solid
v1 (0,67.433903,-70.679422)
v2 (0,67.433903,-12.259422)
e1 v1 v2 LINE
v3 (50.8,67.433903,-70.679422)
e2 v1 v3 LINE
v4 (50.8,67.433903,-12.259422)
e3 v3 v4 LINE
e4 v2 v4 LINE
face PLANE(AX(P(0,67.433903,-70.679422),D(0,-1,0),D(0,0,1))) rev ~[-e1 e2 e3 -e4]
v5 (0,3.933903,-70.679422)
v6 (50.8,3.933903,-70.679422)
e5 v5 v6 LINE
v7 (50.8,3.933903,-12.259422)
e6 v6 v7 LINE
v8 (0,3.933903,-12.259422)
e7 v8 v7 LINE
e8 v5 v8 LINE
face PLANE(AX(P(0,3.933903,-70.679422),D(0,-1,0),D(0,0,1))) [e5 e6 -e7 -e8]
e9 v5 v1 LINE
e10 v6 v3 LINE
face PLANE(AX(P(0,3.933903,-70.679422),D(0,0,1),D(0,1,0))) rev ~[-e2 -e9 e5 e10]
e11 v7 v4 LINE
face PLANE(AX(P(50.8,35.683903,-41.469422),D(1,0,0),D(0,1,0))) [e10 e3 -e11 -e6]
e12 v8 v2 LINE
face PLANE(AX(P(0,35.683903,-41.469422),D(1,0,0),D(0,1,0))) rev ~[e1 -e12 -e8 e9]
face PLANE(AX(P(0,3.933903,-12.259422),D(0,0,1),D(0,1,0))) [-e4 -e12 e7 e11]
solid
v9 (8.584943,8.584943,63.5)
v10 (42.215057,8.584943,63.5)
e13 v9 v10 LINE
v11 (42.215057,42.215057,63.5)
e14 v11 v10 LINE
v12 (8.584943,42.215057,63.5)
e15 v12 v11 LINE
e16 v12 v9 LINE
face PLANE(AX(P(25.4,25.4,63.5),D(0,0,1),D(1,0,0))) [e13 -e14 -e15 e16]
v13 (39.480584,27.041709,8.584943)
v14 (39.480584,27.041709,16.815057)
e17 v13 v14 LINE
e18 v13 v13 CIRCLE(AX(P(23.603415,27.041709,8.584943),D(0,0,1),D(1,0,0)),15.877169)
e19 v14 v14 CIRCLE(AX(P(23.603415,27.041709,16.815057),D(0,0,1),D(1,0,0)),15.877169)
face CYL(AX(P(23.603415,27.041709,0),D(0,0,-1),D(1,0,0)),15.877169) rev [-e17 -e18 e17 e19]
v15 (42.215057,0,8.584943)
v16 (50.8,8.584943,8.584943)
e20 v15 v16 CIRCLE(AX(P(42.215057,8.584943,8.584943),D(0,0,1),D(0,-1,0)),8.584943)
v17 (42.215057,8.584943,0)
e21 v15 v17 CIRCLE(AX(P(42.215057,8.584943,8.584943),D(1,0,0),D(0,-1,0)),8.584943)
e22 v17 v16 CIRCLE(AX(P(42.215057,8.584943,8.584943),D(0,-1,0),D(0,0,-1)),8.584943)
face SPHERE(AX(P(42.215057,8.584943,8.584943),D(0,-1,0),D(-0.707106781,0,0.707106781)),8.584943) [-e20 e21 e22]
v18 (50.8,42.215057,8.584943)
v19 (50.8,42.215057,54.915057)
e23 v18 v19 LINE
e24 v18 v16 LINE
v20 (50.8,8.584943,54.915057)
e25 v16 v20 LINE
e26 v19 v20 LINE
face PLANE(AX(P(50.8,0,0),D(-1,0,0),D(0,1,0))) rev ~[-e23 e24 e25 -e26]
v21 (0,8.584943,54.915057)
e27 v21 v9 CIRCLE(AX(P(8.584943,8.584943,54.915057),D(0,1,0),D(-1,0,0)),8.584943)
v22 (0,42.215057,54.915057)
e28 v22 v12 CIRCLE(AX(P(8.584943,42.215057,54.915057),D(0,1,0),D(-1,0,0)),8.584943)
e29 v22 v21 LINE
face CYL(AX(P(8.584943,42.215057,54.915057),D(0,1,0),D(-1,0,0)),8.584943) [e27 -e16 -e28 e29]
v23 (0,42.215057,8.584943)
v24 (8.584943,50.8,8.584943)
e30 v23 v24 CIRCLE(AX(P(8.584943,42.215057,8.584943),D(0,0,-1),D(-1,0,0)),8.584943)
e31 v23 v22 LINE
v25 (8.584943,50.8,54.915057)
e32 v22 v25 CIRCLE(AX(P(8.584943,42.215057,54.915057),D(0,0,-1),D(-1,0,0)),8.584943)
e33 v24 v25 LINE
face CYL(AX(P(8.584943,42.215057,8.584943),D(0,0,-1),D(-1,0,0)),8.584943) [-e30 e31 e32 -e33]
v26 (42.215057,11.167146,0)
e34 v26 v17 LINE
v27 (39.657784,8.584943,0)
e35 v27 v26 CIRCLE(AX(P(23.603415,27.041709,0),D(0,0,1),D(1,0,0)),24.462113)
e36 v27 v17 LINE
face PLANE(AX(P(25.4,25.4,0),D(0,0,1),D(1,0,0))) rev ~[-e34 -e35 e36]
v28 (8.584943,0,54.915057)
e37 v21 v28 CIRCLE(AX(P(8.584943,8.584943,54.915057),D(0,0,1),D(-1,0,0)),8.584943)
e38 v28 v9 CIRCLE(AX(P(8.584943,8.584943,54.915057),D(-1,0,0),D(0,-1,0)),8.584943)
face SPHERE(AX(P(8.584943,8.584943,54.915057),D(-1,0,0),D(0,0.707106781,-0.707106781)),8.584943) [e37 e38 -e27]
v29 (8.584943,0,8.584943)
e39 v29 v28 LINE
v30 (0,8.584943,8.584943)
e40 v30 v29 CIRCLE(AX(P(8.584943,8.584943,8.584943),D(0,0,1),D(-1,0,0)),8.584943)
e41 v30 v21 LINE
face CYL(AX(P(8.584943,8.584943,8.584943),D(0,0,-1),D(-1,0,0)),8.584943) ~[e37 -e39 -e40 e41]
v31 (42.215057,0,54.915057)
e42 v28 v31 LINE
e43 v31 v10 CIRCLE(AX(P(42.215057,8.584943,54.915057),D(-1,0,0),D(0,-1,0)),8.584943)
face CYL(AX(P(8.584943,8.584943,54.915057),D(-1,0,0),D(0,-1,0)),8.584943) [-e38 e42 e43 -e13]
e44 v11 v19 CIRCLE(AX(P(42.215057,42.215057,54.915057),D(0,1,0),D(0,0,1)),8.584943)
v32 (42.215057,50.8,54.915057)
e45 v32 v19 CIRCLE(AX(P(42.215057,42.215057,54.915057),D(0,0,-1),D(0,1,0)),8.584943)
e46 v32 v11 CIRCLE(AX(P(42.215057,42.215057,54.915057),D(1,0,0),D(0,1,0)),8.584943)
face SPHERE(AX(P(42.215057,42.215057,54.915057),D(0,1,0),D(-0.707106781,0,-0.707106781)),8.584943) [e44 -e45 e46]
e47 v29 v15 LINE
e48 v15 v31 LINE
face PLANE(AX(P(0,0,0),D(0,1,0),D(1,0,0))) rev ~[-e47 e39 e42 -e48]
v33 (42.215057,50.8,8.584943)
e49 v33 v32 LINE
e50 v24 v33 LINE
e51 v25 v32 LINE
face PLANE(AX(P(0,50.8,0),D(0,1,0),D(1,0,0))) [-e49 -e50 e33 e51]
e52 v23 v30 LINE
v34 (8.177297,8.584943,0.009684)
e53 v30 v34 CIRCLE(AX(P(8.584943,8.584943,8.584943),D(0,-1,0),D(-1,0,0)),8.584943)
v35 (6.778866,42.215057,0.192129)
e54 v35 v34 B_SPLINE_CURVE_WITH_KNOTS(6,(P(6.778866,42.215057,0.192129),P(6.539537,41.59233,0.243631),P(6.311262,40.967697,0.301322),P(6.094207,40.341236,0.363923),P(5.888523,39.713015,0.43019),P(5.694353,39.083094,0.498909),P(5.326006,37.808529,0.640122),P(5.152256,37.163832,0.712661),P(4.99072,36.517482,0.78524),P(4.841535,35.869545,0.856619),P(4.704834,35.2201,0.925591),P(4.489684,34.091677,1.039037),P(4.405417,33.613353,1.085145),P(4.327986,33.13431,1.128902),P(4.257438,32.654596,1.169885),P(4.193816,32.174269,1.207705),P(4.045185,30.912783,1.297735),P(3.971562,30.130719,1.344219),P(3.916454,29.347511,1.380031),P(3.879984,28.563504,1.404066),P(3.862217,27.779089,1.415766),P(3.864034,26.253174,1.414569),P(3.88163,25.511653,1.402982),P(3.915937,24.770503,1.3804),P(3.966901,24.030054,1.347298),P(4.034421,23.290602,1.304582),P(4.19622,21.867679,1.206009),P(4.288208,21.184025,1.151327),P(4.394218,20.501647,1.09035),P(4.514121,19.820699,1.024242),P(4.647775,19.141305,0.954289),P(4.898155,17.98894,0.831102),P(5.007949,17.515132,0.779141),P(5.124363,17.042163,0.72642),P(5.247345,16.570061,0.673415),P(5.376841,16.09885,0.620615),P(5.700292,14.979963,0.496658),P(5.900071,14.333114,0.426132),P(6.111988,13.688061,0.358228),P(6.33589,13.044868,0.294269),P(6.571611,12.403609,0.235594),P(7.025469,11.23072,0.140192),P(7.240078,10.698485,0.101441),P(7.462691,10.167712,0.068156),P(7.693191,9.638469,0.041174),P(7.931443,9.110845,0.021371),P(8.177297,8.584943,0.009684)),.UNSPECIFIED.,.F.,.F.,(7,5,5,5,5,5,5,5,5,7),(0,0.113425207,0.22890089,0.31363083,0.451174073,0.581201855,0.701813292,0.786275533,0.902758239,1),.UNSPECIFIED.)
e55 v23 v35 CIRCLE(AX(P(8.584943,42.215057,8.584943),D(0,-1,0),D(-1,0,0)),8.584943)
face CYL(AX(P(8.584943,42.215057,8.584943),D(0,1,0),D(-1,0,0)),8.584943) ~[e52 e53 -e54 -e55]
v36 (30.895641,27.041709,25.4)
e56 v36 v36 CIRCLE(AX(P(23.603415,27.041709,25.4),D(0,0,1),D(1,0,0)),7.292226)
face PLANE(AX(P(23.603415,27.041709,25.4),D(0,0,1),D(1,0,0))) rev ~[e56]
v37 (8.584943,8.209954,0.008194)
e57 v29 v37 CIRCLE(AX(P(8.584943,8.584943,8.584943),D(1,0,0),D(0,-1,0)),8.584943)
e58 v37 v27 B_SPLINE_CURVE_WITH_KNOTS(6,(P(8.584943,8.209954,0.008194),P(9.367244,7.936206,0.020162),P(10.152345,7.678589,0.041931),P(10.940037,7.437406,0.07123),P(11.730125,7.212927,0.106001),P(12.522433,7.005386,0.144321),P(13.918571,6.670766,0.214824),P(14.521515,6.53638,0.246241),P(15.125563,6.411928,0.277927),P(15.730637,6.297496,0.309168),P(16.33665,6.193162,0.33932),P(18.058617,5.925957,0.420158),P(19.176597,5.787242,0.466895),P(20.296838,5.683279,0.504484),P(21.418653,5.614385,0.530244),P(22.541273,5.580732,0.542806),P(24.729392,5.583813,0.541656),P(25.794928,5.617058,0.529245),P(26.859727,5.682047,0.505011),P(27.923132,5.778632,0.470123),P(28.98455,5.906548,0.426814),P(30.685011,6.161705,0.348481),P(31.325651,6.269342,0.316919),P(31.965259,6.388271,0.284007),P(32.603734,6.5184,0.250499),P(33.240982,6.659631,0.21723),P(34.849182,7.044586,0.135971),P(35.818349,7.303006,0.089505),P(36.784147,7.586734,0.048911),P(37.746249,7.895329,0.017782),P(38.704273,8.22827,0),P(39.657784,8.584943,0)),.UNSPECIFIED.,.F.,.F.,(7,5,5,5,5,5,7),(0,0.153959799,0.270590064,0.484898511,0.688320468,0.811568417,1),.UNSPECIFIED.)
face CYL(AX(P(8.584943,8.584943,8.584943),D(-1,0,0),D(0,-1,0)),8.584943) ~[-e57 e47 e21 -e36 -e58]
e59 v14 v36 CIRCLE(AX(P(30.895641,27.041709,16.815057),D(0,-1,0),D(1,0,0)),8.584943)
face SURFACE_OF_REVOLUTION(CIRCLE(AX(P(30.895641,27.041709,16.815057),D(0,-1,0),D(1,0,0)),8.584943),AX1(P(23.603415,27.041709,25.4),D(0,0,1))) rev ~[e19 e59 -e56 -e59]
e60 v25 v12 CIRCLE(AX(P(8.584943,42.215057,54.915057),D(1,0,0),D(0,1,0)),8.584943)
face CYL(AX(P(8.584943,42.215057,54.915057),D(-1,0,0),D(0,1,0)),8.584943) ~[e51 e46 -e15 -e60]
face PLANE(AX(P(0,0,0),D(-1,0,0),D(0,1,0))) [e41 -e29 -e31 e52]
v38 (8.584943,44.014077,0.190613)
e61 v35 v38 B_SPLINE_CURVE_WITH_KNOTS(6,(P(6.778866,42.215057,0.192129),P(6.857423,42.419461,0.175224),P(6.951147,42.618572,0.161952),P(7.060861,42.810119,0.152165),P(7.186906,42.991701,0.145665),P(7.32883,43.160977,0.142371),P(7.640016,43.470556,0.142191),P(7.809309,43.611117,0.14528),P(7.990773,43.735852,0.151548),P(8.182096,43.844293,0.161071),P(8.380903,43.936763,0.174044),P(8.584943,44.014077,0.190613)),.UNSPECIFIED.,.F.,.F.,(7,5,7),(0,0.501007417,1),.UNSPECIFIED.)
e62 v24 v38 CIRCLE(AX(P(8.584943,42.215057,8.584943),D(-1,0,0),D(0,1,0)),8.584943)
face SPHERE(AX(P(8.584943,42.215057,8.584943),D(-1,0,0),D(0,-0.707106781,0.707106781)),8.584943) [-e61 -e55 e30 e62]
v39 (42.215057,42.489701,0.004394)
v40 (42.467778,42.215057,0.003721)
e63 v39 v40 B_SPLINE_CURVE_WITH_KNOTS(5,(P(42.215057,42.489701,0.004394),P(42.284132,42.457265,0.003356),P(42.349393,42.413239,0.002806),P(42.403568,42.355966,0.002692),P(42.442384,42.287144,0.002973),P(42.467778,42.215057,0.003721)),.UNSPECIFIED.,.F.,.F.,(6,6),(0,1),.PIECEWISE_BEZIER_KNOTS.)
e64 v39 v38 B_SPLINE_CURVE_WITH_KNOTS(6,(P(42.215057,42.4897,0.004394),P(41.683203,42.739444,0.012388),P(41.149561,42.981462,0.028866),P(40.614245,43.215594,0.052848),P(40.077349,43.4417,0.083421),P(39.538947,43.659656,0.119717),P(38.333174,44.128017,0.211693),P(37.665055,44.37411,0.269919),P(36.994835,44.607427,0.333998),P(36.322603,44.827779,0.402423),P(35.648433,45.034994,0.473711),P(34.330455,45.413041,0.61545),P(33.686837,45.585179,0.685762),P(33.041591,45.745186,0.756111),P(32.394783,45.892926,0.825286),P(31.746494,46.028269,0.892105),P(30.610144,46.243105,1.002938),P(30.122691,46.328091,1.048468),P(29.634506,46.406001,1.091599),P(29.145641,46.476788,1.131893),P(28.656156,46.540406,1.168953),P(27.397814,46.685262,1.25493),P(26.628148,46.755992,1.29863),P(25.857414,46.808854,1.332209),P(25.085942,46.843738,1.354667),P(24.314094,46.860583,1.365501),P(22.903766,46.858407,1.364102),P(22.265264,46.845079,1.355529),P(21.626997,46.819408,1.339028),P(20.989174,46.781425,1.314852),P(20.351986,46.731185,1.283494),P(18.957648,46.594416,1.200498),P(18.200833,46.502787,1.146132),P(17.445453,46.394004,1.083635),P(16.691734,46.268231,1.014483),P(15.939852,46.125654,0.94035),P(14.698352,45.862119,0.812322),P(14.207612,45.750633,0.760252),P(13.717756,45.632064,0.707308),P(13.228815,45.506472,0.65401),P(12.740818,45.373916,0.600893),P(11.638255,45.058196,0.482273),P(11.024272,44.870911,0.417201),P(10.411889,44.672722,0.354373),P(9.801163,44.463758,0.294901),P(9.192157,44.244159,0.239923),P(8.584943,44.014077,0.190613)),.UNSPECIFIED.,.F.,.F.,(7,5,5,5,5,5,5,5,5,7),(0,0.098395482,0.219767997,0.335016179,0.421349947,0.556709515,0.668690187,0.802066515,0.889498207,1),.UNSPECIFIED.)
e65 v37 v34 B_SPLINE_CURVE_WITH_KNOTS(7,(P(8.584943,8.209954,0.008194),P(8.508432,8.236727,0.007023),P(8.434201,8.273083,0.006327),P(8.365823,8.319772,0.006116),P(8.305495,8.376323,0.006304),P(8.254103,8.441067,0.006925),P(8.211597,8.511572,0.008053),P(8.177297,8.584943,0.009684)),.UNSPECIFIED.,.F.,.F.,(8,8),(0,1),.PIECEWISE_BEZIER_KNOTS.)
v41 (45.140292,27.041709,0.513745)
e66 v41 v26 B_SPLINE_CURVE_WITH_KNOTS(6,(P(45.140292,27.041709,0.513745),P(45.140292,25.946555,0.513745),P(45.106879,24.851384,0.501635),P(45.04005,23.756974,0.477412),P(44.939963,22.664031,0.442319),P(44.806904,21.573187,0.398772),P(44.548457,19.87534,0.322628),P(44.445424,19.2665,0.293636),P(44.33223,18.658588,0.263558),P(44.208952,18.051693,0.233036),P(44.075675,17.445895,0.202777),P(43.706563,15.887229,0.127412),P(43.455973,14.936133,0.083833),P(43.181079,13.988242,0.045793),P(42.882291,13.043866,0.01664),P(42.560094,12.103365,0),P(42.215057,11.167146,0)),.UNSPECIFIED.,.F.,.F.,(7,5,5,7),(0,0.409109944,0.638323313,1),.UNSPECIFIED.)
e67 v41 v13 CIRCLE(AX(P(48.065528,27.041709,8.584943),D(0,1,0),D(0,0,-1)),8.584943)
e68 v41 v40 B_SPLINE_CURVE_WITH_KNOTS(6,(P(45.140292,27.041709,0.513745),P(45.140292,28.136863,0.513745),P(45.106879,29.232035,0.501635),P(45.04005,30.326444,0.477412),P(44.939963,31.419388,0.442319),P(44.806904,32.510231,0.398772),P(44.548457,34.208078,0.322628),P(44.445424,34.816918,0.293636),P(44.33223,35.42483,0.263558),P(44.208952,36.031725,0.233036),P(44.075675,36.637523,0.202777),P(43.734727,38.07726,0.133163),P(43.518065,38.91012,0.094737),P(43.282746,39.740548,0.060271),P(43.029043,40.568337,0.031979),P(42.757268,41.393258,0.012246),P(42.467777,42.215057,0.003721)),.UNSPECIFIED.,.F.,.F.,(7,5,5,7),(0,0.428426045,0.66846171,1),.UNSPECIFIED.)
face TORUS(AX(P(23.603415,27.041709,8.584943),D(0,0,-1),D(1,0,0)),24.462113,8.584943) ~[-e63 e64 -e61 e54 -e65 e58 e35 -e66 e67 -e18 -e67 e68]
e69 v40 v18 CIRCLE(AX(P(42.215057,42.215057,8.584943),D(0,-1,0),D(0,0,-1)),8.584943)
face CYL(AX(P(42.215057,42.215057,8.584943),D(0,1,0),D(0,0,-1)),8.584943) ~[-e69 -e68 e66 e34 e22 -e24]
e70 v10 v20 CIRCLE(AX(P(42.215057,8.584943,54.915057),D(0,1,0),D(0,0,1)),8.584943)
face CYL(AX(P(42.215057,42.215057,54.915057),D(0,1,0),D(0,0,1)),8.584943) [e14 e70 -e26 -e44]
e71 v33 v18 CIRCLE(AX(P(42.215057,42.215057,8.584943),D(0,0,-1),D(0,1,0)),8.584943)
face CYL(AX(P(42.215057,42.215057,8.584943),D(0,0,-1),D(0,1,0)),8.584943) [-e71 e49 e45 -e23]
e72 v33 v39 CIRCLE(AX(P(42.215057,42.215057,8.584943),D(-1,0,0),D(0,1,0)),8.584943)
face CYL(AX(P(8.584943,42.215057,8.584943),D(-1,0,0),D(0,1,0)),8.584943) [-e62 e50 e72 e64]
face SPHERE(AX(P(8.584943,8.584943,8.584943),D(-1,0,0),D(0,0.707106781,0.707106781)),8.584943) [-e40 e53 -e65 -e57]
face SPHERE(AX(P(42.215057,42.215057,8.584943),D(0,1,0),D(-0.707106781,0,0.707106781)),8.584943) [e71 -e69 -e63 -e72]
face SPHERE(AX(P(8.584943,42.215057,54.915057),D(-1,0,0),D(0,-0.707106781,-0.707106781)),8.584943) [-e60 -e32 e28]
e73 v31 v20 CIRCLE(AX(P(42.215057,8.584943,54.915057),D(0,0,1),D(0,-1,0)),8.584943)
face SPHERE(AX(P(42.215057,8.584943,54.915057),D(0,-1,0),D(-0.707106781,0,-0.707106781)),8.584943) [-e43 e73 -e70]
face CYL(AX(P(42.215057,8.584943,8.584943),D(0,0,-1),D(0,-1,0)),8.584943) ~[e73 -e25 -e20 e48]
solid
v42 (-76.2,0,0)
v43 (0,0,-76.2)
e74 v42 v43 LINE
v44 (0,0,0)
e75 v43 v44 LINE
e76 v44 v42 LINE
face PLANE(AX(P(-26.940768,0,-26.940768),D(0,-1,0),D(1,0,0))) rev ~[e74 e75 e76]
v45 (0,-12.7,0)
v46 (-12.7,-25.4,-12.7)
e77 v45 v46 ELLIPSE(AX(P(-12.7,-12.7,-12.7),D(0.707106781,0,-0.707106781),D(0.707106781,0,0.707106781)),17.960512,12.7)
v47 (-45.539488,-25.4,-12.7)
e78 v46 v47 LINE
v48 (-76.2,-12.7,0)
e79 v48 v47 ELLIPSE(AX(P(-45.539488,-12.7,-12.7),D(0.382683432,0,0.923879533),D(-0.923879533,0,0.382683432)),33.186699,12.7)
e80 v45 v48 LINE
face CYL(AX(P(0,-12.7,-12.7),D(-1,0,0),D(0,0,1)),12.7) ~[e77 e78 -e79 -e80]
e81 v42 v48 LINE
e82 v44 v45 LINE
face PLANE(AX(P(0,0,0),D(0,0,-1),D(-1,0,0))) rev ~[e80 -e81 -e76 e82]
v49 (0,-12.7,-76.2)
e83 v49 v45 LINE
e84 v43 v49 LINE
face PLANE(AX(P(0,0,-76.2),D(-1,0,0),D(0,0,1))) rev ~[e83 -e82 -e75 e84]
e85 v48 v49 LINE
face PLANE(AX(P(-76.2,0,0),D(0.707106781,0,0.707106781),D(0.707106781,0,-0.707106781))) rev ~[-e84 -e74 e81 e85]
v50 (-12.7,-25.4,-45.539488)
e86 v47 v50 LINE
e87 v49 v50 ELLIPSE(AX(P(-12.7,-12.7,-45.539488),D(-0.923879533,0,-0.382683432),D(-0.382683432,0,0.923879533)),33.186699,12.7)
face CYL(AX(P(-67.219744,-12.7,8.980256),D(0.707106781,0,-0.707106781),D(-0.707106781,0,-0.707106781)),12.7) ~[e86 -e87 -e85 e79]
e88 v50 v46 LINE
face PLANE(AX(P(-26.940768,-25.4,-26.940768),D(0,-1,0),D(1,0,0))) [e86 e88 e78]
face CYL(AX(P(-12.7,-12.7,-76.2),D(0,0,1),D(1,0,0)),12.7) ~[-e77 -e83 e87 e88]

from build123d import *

# Parameters (mm, degrees)
F0_W         = 50.8
F0_H         = 50.8
F1_DEPTH     = 63.5
F2_R         = 15.8771693286
F3_DEPTH     = 25.4
F5_T3_DEPTH  = 46.3301131444
F5_T5_DEPTH  = 33.6301131444
F5_T7_DEPTH  = 33.6301131444
F5_S11_W     = 8.5849434278
F5_S11_H     = 8.5849434278
F5_T12_DEPTH = 8.5849434278
F5_S17_W     = 8.5849434278
F5_S17_H     = 8.5849434278
F5_T18_DEPTH = 8.5849434278
F5_S23_W     = 8.5849434278
F5_S23_H     = 8.5849434278
F5_T24_DEPTH = 8.5849434278
F5_S29_W     = 8.5849434278
F5_S29_H     = 8.5849434278
F5_T30_DEPTH = 8.5849434278
F5_S35_W     = 8.5849434278
F5_S35_H     = 8.5849434278
F5_T36_DEPTH = 8.5849434278
F5_S41_W     = 8.5849434278
F5_S41_H     = 8.5849434278
F5_T42_DEPTH = 8.5849434278
F5_S47_W     = 8.5849434278
F5_S47_H     = 8.5849434278
F5_T48_DEPTH = 8.5849434278
F5_S53_W     = 8.5849434278
F5_S53_H     = 8.5849434278
F5_T54_DEPTH = 8.5849434278
F7_DEPTH     = 25.4
F8_R         = 12.7
F9_W         = 63.5
F9_H         = 58.42
F10_DEPTH    = 50.8


# Not quite as in the source:
# - a fillet or chamfer that OpenCascade refuses, or shapes differently, is made with other operations: its cross-section is extruded or revolved along the edge and cut away or added


with BuildPart() as f1:
    # F0 (on Top) → F1 (new body)
    with BuildSketch(Plane.XY):
        with Locations((25.4, 25.4)):
            Rectangle(F0_W, F0_H)
    extrude(amount=F1_DEPTH)


with BuildPart() as f3:
    # F2 (on Top) → F3 (new body)
    with BuildSketch(Plane.XY):
        with Locations((23.6034151167, 27.0417090505)):
            Circle(F2_R)
    extrude(amount=F3_DEPTH)


with BuildPart() as f1_1:
    add(f1.part)

    # F4: cut F3
    add(f3.part, mode=Mode.SUBTRACT)

    # F5: fillet of radius 8.5849434278 on 14 edges, made by hand

    # F5_s1 → F5_t2 (revolve)
    with BuildSketch(Plane.XZ.offset(-27.0417090505)):
        with BuildLine():
            ThreePointArc((39.4805844452, 16.8150565722), (36.9661127313, 22.8855282861), (30.8956410174, 25.4))
            Line((30.8956410174, 25.4), (39.4805844452, 25.4))
            Line((39.4805844452, 25.4), (39.4805844452, 16.8150565722))
        make_face()
    revolve(axis=Axis((23.6034151167, 27.0417090505, 25.4), (0, 0, 1)))

    # F5_s4 → F5_t3 (cut)
    with BuildSketch(Plane.XY.offset(8.5849434278)):
        with BuildLine():
            ThreePointArc((0, 42.2150565722), (2.5144717139, 48.2855282861), (8.5849434278, 50.8))
            Line((8.5849434278, 50.8), (0, 50.8))
            Line((0, 50.8), (0, 42.2150565722))
        make_face()
        with BuildLine():
            ThreePointArc((0, 8.5849434278), (2.5144717139, 2.5144717139), (8.5849434278, 0))
            Line((8.5849434278, 0), (0, 0))
            Line((0, 0), (0, 8.5849434278))
        make_face()
        with BuildLine():
            ThreePointArc((42.2150565722, 50.8), (48.2855282861, 48.2855282861), (50.8, 42.2150565722))
            Line((50.8, 42.2150565722), (50.8, 50.8))
            Line((50.8, 50.8), (42.2150565722, 50.8))
        make_face()
        with BuildLine():
            ThreePointArc((42.2150565722, 0), (48.2855282861, 2.5144717139), (50.8, 8.5849434278))
            Line((50.8, 8.5849434278), (50.8, 0))
            Line((50.8, 0), (42.2150565722, 0))
        make_face()
    extrude(amount=F5_T3_DEPTH, mode=Mode.SUBTRACT)

    # F5_s6 → F5_t5 (cut)
    with BuildSketch(Plane.XZ.offset(-42.2150565722)):
        with BuildLine():
            ThreePointArc((0, 8.5849434278), (2.5144717139, 2.5144717139), (8.5849434278, 0))
            Line((8.5849434278, 0), (0, 0))
            Line((0, 0), (0, 8.5849434278))
        make_face()
        with BuildLine():
            ThreePointArc((0, 54.9150565722), (2.5144717139, 60.9855282861), (8.5849434278, 63.5))
            Line((8.5849434278, 63.5), (0, 63.5))
            Line((0, 63.5), (0, 54.9150565722))
        make_face()
        with BuildLine():
            ThreePointArc((42.2150565722, 0), (48.2855282861, 2.5144717139), (50.8, 8.5849434278))
            Line((50.8, 8.5849434278), (50.8, 0))
            Line((50.8, 0), (42.2150565722, 0))
        make_face()
        with BuildLine():
            ThreePointArc((42.2150565722, 63.5), (48.2855282861, 60.9855282861), (50.8, 54.9150565722))
            Line((50.8, 54.9150565722), (50.8, 63.5))
            Line((50.8, 63.5), (42.2150565722, 63.5))
        make_face()
    extrude(amount=F5_T5_DEPTH, mode=Mode.SUBTRACT)

    # F5_s8 → F5_t7 (cut)
    with BuildSketch(Plane.YZ.offset(8.5849434278)):
        with BuildLine():
            ThreePointArc((50.8, 8.5849434278), (48.2855282861, 2.5144717139), (42.2150565722, 0))
            Line((42.2150565722, 0), (50.8, 0))
            Line((50.8, 0), (50.8, 8.5849434278))
        make_face()
        with BuildLine():
            ThreePointArc((50.8, 54.9150565722), (48.2855282861, 60.9855282861), (42.2150565722, 63.5))
            Line((42.2150565722, 63.5), (50.8, 63.5))
            Line((50.8, 63.5), (50.8, 54.9150565722))
        make_face()
        with BuildLine():
            ThreePointArc((0, 8.5849434278), (2.5144717139, 2.5144717139), (8.5849434278, 0))
            Line((8.5849434278, 0), (0, 0))
            Line((0, 0), (0, 8.5849434278))
        make_face()
        with BuildLine():
            ThreePointArc((0, 54.9150565722), (2.5144717139, 60.9855282861), (8.5849434278, 63.5))
            Line((8.5849434278, 63.5), (0, 63.5))
            Line((0, 63.5), (0, 54.9150565722))
        make_face()
    extrude(amount=F5_T7_DEPTH, mode=Mode.SUBTRACT)


with BuildPart() as f5_tool10:
    # F5_s11 → F5_t12 (new body)
    with BuildSketch(Plane.YZ.offset(8.5849434278)):
        with Locations((46.5075282861, 4.2924717139)):
            Rectangle(F5_S11_W, F5_S11_H)
    extrude(amount=-F5_T12_DEPTH)

    # F5_s13 → F5_t14 (revolve, cut)
    with BuildSketch(Plane(origin=(8.5849434278, 42.2150565722, 8.5849434278), x_dir=(0, -0.7071067812, 0.7071067812), z_dir=(0, -0.7071067812, -0.7071067812))):
        with BuildLine():
            ThreePointArc((0, -8.5849434278), (8.5849434278, 0), (0, 8.5849434278))
            Line((0, 8.5849434278), (0, -8.5849434278))
        make_face()
    revolve(axis=Axis((8.5849434278, 42.2150565722, 8.5849434278), (-1, 0, 0)), mode=Mode.SUBTRACT)


with BuildPart() as f1_2:
    add(f1_1.part)

    # F5_t9: cut F5_tool10
    add(f5_tool10.part, mode=Mode.SUBTRACT)


with BuildPart() as f5_tool16:
    # F5_s17 → F5_t18 (new body)
    with BuildSketch(Plane.YZ.offset(8.5849434278)):
        with Locations((46.5075282861, 59.2075282861)):
            Rectangle(F5_S17_W, F5_S17_H)
    extrude(amount=-F5_T18_DEPTH)

    # F5_s19 → F5_t20 (revolve, cut)
    with BuildSketch(Plane(origin=(8.5849434278, 42.2150565722, 54.9150565722), x_dir=(0, -0.7071067812, -0.7071067812), z_dir=(0, 0.7071067812, -0.7071067812))):
        with BuildLine():
            ThreePointArc((0, -8.5849434278), (8.5849434278, 0), (0, 8.5849434278))
            Line((0, 8.5849434278), (0, -8.5849434278))
        make_face()
    revolve(axis=Axis((8.5849434278, 42.2150565722, 54.9150565722), (-1, 0, 0)), mode=Mode.SUBTRACT)


with BuildPart() as f1_3:
    add(f1_2.part)

    # F5_t15: cut F5_tool16
    add(f5_tool16.part, mode=Mode.SUBTRACT)


with BuildPart() as f5_tool22:
    # F5_s23 → F5_t24 (new body)
    with BuildSketch(Plane.YZ.offset(8.5849434278)):
        with Locations((4.2924717139, 4.2924717139)):
            Rectangle(F5_S23_W, F5_S23_H)
    extrude(amount=-F5_T24_DEPTH)

    # F5_s25 → F5_t26 (revolve, cut)
    with BuildSketch(Plane(origin=(8.5849434278, 8.5849434278, 8.5849434278), x_dir=(0, 0.7071067812, 0.7071067812), z_dir=(0, -0.7071067812, 0.7071067812))):
        with BuildLine():
            ThreePointArc((0, -8.5849434278), (8.5849434278, 0), (0, 8.5849434278))
            Line((0, 8.5849434278), (0, -8.5849434278))
        make_face()
    revolve(axis=Axis((8.5849434278, 8.5849434278, 8.5849434278), (-1, 0, 0)), mode=Mode.SUBTRACT)


with BuildPart() as f1_4:
    add(f1_3.part)

    # F5_t21: cut F5_tool22
    add(f5_tool22.part, mode=Mode.SUBTRACT)


with BuildPart() as f5_tool28:
    # F5_s29 → F5_t30 (new body)
    with BuildSketch(Plane.YZ.offset(8.5849434278)):
        with Locations((4.2924717139, 59.2075282861)):
            Rectangle(F5_S29_W, F5_S29_H)
    extrude(amount=-F5_T30_DEPTH)

    # F5_s31 → F5_t32 (revolve, cut)
    with BuildSketch(Plane(origin=(8.5849434278, 8.5849434278, 54.9150565722), x_dir=(0, 0.7071067812, -0.7071067812), z_dir=(0, 0.7071067812, 0.7071067812))):
        with BuildLine():
            ThreePointArc((0, -8.5849434278), (8.5849434278, 0), (0, 8.5849434278))
            Line((0, 8.5849434278), (0, -8.5849434278))
        make_face()
    revolve(axis=Axis((8.5849434278, 8.5849434278, 54.9150565722), (-1, 0, 0)), mode=Mode.SUBTRACT)


with BuildPart() as f1_5:
    add(f1_4.part)

    # F5_t27: cut F5_tool28
    add(f5_tool28.part, mode=Mode.SUBTRACT)


with BuildPart() as f5_tool34:
    # F5_s35 → F5_t36 (new body)
    with BuildSketch(Plane.XZ.offset(-42.2150565722)):
        with Locations((46.5075282861, 4.2924717139)):
            Rectangle(F5_S35_W, F5_S35_H)
    extrude(amount=-F5_T36_DEPTH)

    # F5_s37 → F5_t38 (revolve, cut)
    with BuildSketch(Plane(origin=(42.2150565722, 42.2150565722, 8.5849434278), x_dir=(-0.7071067812, 0, 0.7071067812), z_dir=(-0.7071067812, 0, -0.7071067812))):
        with BuildLine():
            ThreePointArc((0, -8.5849434278), (8.5849434278, 0), (0, 8.5849434278))
            Line((0, 8.5849434278), (0, -8.5849434278))
        make_face()
    revolve(axis=Axis((42.2150565722, 42.2150565722, 8.5849434278), (0, 1, 0)), mode=Mode.SUBTRACT)


with BuildPart() as f1_6:
    add(f1_5.part)

    # F5_t33: cut F5_tool34
    add(f5_tool34.part, mode=Mode.SUBTRACT)


with BuildPart() as f5_tool40:
    # F5_s41 → F5_t42 (new body)
    with BuildSketch(Plane.XZ.offset(-42.2150565722)):
        with Locations((46.5075282861, 59.2075282861)):
            Rectangle(F5_S41_W, F5_S41_H)
    extrude(amount=-F5_T42_DEPTH)

    # F5_s43 → F5_t44 (revolve, cut)
    with BuildSketch(Plane(origin=(42.2150565722, 42.2150565722, 54.9150565722), x_dir=(-0.7071067812, 0, -0.7071067812), z_dir=(0.7071067812, 0, -0.7071067812))):
        with BuildLine():
            ThreePointArc((0, -8.5849434278), (8.5849434278, 0), (0, 8.5849434278))
            Line((0, 8.5849434278), (0, -8.5849434278))
        make_face()
    revolve(axis=Axis((42.2150565722, 42.2150565722, 54.9150565722), (0, 1, 0)), mode=Mode.SUBTRACT)


with BuildPart() as f1_7:
    add(f1_6.part)

    # F5_t39: cut F5_tool40
    add(f5_tool40.part, mode=Mode.SUBTRACT)


with BuildPart() as f5_tool46:
    # F5_s47 → F5_t48 (new body)
    with BuildSketch(Plane.XZ.offset(-8.5849434278)):
        with Locations((46.5075282861, 4.2924717139)):
            Rectangle(F5_S47_W, F5_S47_H)
    extrude(amount=F5_T48_DEPTH)

    # F5_s49 → F5_t50 (revolve, cut)
    with BuildSketch(Plane(origin=(42.2150565722, 8.5849434278, 8.5849434278), x_dir=(-0.7071067812, 0, 0.7071067812), z_dir=(0.7071067812, 0, 0.7071067812))):
        with BuildLine():
            ThreePointArc((0, -8.5849434278), (8.5849434278, 0), (0, 8.5849434278))
            Line((0, 8.5849434278), (0, -8.5849434278))
        make_face()
    revolve(axis=Axis((42.2150565722, 8.5849434278, 8.5849434278), (0, -1, 0)), mode=Mode.SUBTRACT)


with BuildPart() as f1_8:
    add(f1_7.part)

    # F5_t45: cut F5_tool46
    add(f5_tool46.part, mode=Mode.SUBTRACT)


with BuildPart() as f5_tool52:
    # F5_s53 → F5_t54 (new body)
    with BuildSketch(Plane.XZ.offset(-8.5849434278)):
        with Locations((46.5075282861, 59.2075282861)):
            Rectangle(F5_S53_W, F5_S53_H)
    extrude(amount=F5_T54_DEPTH)

    # F5_s55 → F5_t56 (revolve, cut)
    with BuildSketch(Plane(origin=(42.2150565722, 8.5849434278, 54.9150565722), x_dir=(-0.7071067812, 0, -0.7071067812), z_dir=(-0.7071067812, 0, 0.7071067812))):
        with BuildLine():
            ThreePointArc((0, -8.5849434278), (8.5849434278, 0), (0, 8.5849434278))
            Line((0, 8.5849434278), (0, -8.5849434278))
        make_face()
    revolve(axis=Axis((42.2150565722, 8.5849434278, 54.9150565722), (0, -1, 0)), mode=Mode.SUBTRACT)


with BuildPart() as f1_9:
    add(f1_8.part)

    # F5_t51: cut F5_tool52
    add(f5_tool52.part, mode=Mode.SUBTRACT)

    # F5_s57 → F5_t58 (revolve, cut)
    with BuildSketch(Plane.XZ.offset(-27.0417090505)):
        with BuildLine():
            ThreePointArc((48.065527873, 0), (41.9950561591, 2.5144717139), (39.4805844452, 8.5849434278))
            Line((39.4805844452, 8.5849434278), (39.4805844452, 0))
            Line((39.4805844452, 0), (48.065527873, 0))
        make_face()
    revolve(axis=Axis((23.6034151167, 27.0417090505, 0), (0, 0, 1)), mode=Mode.SUBTRACT)


with BuildPart() as f7:
    # F6 (on Front) → F7 (new body)
    with BuildSketch(Plane.XZ):
        Polygon((0, -76.2), (0, 0), (-76.2, 0), align=None)
    extrude(amount=F7_DEPTH)

    # F8
    f8_edges = [f7.edges().sort_by_distance(p)[0] for p in [
        (0, -25.4, -38.1),
        (-38.1, -25.4, 0),
        (-38.1, -25.4, -38.1),
    ]]
    fillet(f8_edges, radius=F8_R)


with BuildPart() as f10:
    # F9 (on Right) → F10 (new body)
    with BuildSketch(Plane.YZ):
        with Locations((35.6839029118, -41.4694223068)):
            Rectangle(F9_W, F9_H)
    extrude(amount=F10_DEPTH)


solid = Compound([f1_9.part, f7.part, f10.part])
